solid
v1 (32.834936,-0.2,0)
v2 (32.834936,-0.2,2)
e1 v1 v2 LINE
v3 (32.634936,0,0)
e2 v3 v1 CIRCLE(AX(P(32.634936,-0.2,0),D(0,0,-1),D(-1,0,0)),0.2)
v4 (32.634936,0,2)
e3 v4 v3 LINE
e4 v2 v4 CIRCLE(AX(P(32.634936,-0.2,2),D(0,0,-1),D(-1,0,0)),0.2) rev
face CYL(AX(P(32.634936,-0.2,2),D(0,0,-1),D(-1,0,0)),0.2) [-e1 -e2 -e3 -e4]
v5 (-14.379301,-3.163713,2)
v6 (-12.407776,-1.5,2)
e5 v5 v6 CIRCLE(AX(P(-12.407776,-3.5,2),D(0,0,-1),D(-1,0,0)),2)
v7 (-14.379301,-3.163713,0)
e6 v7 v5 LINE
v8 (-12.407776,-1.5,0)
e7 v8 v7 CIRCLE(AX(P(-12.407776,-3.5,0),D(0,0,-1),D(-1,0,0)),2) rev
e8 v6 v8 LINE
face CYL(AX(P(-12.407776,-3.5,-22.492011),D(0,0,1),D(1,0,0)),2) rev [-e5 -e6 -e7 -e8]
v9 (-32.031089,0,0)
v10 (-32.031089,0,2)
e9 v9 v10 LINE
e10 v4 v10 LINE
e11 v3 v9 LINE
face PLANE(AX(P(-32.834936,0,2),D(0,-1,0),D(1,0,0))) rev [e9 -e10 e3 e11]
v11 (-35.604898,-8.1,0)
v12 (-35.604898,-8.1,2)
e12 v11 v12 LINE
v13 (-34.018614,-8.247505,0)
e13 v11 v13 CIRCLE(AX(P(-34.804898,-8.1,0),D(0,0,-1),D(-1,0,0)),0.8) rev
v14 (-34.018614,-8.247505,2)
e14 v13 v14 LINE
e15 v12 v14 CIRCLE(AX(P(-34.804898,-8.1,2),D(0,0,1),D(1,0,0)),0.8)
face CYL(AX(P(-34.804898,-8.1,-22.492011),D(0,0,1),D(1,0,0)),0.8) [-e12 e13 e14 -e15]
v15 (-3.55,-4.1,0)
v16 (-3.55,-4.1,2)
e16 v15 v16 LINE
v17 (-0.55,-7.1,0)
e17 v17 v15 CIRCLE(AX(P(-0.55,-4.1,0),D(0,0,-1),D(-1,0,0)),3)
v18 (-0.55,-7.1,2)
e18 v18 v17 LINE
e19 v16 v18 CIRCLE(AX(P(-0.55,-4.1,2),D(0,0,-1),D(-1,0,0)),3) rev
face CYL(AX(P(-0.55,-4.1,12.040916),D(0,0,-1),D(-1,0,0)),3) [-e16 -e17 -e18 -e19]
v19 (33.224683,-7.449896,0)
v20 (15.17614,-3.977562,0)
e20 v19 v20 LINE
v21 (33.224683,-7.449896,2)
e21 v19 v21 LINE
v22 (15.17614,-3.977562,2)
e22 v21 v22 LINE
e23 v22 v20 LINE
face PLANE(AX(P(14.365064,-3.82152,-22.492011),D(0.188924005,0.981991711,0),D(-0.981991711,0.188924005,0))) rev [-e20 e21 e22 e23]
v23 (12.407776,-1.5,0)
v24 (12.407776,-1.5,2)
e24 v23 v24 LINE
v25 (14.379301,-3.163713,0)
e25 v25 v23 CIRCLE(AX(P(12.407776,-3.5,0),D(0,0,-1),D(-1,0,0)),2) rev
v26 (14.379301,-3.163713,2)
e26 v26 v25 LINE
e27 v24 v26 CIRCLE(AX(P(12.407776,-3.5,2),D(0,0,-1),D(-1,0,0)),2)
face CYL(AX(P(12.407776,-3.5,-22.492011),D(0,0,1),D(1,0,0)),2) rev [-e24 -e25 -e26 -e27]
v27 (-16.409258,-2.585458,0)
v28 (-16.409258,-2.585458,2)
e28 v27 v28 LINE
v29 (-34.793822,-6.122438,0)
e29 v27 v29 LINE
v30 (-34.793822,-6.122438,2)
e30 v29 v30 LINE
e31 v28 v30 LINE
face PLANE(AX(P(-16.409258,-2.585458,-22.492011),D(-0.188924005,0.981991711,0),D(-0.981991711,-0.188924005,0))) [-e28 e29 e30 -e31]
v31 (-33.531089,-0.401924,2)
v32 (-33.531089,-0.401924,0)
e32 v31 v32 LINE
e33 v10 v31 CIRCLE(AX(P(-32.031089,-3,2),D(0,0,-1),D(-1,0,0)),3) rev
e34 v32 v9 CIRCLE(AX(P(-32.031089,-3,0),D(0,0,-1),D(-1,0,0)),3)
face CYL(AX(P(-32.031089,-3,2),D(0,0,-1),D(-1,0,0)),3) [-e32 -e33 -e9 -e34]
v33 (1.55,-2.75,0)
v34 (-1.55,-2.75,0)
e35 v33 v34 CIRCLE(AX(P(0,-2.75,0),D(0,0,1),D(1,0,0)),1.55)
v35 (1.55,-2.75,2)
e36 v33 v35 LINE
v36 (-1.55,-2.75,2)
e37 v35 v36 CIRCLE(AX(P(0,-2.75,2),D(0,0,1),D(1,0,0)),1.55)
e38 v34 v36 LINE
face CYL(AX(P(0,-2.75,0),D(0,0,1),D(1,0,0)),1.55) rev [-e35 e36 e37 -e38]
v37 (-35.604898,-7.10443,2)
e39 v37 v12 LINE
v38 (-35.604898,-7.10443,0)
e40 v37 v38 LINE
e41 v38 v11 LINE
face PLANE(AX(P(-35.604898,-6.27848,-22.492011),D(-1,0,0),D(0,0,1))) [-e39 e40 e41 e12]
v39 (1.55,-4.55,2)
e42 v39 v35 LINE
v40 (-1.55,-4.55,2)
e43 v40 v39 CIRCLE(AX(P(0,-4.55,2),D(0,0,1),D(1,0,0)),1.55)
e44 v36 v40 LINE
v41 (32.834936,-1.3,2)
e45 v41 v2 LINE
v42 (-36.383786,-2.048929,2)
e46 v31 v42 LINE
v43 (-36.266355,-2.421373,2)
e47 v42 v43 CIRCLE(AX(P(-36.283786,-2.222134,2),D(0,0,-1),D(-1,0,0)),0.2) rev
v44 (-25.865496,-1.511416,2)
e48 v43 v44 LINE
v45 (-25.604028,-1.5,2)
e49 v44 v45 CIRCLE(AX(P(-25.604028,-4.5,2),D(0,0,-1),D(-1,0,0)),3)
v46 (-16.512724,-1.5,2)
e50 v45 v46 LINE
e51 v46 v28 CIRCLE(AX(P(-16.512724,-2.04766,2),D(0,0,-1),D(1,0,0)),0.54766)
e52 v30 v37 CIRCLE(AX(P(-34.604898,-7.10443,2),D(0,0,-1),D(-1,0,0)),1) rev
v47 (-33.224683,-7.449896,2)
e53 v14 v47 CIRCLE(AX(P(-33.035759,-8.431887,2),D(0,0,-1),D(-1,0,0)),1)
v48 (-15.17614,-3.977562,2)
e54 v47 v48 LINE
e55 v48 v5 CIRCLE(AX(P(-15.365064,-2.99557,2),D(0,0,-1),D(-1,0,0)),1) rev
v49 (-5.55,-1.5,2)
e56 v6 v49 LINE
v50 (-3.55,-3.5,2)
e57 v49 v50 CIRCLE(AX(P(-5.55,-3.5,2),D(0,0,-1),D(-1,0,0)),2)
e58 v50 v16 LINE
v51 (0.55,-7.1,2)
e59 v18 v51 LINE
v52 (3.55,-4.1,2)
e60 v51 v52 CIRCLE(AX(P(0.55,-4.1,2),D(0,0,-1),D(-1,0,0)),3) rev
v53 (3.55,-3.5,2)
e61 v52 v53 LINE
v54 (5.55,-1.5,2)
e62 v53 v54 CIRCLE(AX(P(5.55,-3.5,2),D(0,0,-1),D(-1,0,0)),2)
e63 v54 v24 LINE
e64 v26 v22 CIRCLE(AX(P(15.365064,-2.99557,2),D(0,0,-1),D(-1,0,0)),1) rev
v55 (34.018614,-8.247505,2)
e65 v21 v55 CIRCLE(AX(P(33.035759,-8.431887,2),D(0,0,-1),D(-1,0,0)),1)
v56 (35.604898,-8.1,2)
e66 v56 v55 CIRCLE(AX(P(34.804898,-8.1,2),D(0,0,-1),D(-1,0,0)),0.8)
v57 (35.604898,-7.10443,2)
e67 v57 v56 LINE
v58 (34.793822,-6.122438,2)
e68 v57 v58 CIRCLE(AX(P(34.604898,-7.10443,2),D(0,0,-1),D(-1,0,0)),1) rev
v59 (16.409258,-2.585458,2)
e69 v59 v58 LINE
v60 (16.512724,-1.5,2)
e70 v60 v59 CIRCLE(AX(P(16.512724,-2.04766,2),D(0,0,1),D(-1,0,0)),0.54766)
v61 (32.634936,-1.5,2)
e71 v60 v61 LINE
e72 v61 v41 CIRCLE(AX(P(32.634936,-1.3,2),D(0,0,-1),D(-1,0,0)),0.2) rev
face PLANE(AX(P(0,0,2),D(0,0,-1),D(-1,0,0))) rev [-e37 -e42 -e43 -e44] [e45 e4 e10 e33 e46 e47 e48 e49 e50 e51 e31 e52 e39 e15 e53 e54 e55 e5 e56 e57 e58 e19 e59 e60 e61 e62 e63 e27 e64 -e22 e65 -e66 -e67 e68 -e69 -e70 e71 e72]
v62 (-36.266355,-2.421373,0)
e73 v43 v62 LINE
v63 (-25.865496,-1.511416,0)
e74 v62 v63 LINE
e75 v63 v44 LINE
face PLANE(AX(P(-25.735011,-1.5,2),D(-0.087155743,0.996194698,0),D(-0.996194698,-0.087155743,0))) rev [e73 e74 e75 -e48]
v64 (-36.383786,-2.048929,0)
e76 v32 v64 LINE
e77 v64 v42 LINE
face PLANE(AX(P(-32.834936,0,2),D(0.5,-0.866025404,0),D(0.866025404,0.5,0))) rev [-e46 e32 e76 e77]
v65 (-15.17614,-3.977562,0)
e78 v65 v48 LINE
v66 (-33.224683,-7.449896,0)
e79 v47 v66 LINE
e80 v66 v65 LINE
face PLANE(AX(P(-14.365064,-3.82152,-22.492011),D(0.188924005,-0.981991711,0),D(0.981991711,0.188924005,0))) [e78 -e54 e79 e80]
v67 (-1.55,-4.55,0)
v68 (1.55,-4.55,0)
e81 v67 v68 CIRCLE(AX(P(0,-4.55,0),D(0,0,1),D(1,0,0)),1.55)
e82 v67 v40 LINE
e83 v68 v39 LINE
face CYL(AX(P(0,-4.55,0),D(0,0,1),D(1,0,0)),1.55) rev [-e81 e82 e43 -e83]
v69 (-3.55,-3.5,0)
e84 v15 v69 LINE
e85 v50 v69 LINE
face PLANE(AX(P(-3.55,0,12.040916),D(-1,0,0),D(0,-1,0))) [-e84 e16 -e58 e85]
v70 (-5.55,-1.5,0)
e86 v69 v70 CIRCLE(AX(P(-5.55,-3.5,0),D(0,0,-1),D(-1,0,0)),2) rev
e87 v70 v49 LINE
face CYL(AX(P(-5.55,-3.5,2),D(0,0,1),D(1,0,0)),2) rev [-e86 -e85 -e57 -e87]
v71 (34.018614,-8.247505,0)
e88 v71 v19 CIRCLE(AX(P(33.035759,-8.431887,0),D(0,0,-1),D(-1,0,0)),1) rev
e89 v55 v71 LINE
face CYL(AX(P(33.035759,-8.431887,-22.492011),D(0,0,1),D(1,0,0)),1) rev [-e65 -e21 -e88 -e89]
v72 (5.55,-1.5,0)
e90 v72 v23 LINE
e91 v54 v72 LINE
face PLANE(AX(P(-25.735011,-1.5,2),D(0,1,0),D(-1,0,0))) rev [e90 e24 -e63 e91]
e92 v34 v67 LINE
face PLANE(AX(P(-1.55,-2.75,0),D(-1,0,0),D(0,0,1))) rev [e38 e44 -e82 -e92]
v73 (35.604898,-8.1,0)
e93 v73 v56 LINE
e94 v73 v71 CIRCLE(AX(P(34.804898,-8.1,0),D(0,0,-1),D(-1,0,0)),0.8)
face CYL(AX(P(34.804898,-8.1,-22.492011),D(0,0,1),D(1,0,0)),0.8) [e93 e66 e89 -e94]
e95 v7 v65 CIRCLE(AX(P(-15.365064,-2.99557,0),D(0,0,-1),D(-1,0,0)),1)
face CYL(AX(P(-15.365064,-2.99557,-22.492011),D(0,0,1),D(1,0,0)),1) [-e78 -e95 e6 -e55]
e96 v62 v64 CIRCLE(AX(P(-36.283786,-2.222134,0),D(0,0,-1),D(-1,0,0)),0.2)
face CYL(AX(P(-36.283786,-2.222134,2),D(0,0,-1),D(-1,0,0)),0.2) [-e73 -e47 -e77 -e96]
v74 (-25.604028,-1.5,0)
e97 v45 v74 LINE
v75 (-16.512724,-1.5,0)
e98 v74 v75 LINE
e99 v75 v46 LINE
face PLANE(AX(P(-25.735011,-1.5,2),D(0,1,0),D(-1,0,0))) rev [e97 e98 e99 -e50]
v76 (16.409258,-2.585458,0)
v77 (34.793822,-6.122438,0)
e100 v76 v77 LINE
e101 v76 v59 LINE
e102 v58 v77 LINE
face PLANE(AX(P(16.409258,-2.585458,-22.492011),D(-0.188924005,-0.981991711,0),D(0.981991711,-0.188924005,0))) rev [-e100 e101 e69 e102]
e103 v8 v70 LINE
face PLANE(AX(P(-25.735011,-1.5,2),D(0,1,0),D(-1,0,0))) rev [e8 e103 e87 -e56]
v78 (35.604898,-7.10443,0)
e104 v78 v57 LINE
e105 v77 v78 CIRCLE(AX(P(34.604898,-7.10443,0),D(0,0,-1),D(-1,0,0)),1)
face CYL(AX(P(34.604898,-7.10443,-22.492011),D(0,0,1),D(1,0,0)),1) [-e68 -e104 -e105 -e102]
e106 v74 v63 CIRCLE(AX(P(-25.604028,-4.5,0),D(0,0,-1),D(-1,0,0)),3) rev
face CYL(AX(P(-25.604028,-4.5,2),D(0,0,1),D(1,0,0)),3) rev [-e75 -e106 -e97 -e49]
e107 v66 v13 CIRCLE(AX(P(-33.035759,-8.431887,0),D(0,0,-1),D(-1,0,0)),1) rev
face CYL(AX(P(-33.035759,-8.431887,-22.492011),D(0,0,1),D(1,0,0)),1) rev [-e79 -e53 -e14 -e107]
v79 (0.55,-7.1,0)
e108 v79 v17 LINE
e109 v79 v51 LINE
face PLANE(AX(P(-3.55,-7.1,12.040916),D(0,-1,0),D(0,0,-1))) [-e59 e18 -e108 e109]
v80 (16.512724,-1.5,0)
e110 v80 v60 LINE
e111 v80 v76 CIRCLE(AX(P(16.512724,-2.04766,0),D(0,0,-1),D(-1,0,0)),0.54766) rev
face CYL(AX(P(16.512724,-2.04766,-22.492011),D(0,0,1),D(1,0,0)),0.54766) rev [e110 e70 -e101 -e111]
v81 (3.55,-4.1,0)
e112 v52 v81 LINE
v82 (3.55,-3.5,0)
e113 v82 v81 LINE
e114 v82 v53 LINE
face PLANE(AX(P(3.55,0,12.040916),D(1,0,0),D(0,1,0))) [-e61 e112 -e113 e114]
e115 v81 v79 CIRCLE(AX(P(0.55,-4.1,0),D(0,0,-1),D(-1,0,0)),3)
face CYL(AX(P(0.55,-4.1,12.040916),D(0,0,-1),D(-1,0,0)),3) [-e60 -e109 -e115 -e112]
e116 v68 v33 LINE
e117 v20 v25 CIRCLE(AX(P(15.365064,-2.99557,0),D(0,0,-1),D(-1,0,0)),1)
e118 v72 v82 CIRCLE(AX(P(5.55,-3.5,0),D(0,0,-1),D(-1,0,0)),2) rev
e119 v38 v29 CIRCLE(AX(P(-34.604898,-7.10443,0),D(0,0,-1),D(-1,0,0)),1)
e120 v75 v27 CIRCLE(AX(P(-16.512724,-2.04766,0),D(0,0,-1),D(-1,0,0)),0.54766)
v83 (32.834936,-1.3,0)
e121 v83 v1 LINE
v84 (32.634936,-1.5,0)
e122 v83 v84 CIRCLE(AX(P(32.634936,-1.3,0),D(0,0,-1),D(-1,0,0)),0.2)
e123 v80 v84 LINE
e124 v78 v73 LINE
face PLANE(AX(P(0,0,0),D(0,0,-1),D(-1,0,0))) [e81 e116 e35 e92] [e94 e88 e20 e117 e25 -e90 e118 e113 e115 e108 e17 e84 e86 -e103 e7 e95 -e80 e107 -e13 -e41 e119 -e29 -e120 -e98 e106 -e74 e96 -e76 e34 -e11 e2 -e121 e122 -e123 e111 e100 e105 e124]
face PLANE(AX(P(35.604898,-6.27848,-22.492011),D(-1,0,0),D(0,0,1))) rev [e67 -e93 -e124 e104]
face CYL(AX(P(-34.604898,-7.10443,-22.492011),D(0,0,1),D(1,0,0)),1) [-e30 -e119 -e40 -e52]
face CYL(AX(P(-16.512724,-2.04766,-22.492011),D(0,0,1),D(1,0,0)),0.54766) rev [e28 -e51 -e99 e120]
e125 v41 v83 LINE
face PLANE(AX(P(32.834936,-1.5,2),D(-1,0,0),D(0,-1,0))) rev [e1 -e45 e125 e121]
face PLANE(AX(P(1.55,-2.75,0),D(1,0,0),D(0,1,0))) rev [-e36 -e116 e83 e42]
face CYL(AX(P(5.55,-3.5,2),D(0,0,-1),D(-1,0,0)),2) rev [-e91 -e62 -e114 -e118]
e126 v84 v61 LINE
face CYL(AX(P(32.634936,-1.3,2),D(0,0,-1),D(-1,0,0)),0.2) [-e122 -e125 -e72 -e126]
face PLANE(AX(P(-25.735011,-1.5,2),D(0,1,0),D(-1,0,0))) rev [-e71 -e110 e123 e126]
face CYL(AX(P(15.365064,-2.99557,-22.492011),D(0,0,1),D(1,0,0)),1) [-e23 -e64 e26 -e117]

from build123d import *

# Parameters (mm, degrees)
FLAT_DEPTH              = 2
SKETCH3_W               = 7.1
SKETCH3_H               = 7.1
BOSS_EXTRUDE3_DEPTH     = 2
CUT_EXTRUDE1_DEPTH      = 38.889997963
CUT_EXTRUDE1_DEPTH_BACK = 38.889997963
BOSS_EXTRUDE5_DEPTH     = 2
FILLET3_R               = 1
FILLET4_R               = 2
FILLET8_R               = 2
FILLET6_R               = 0.2
FILLET7_R               = 3


with BuildPart() as part:
    # Sketch2 → flat (new body)
    with BuildSketch(Plane.XY):
        Polygon((-32.834936491, 0), (32.834936491, 0), (32.834936491, -1.5), (-25.735011207, -1.5), (-37.165063509, -2.5), align=None)
    extrude(amount=FLAT_DEPTH)

    # Sketch3 → Boss-Extrude3 (add)
    with BuildSketch(Plane(origin=(0, 0, 0), x_dir=(-1, 0, 0), z_dir=(0, 0, -1))):
        with Locations((0, -3.55)):
            Rectangle(SKETCH3_W, SKETCH3_H)
    extrude(amount=-BOSS_EXTRUDE3_DEPTH)

    # Sketch4 → Cut-Extrude1 (cut, two sides: drawn at the far end of the back side and taken through both)
    with BuildSketch(Plane.XY.offset(2).offset(-CUT_EXTRUDE1_DEPTH_BACK)):
        with BuildLine():
            Line((-1.55, -2.75), (-1.55, -4.55))
            ThreePointArc((-1.55, -4.55), (0, -6.1), (1.55, -4.55))
            Line((1.55, -4.55), (1.55, -2.75))
            ThreePointArc((1.55, -2.75), (0, -1.2), (-1.55, -2.75))
        make_face()
    extrude(amount=CUT_EXTRUDE1_DEPTH + CUT_EXTRUDE1_DEPTH_BACK, mode=Mode.SUBTRACT)

    # Sketch6 → Boss-Extrude5 (add)
    with BuildSketch(Plane.XY.offset(2)):
        with BuildLine():
            Line((-16.409257503, -2.585457858), (-35.604897729, -6.278480095))
            Line((-35.604897729, -6.278480095), (-35.604897729, -8.1))
            ThreePointArc((-35.604897729, -8.1), (-34.804897729, -8.9), (-34.004897729, -8.1))
            Line((-34.004897729, -8.1), (-34.004897729, -7.6))
            Line((-34.004897729, -7.6), (-14.365063509, -3.821519905))
            Line((-14.365063509, -3.821519905), (-14.365063509, -1.5))
            Line((-14.365063509, -1.5), (-16.512723649, -1.5))
            ThreePointArc((-16.512723649, -1.5), (-15.96753469, -1.995692576), (-16.409257503, -2.585457858))
        make_face()
    boss_extrude5 = extrude(amount=-BOSS_EXTRUDE5_DEPTH)

    # Mirror4: Boss-Extrude5 across plane
    add(boss_extrude5.mirror(Plane(origin=(0, 0, 0), x_dir=(0, 0, 1), z_dir=(1, 0, 0))))

    # Fillet3
    fillet3_edges = [part.edges().sort_by_distance(p)[0] for p in [
        (-35.604897729, -6.278480095, 1),
        (-34.004897729, -7.6, 1),
        (-14.365063509, -3.821519905, 1),
        (35.604897729, -6.278480095, 1),
        (34.004897729, -7.6, 1),
        (14.365063509, -3.821519905, 1),
    ]]
    fillet(fillet3_edges, radius=FILLET3_R)

    # Fillet4
    fillet4_edges = [part.edges().sort_by_distance(p)[0] for p in [
        (-14.365063509, -1.5, 1),
        (14.365063509, -1.5, 1),
    ]]
    fillet(fillet4_edges, radius=FILLET4_R)

    # Fillet8
    fillet8_edges = [part.edges().sort_by_distance(p)[0] for p in [
        (-3.55, -1.5, 1),
        (3.55, -1.5, 1),
    ]]
    fillet(fillet8_edges, radius=FILLET8_R)

    # Fillet6
    fillet6_edges = [part.edges().sort_by_distance(p)[0] for p in [
        (32.834936491, 0, 1),
        (32.834936491, -1.5, 1),
        (-37.165063509, -2.5, 1),
    ]]
    fillet(fillet6_edges, radius=FILLET6_R)

    # Fillet7
    # the kernel refuses this fillet: 3 mm, written as the material it adds along each edge
    with BuildSketch(Plane(origin=(-25.735011207, -1.5, 0), x_dir=(-0.996194698091746, -0.0871557427476529, 0), z_dir=(0, 0, 1))) as fillet7_piece_1:
        with BuildLine():
            CenterArc((FILLET7_R * 0.0436609429085, FILLET7_R), FILLET7_R, 265, 5)
            Line((-FILLET7_R * 0.0434947998391, FILLET7_R * 0.00380530190825), (0, 0))
            Line((0, 0), (FILLET7_R * 0.0436609429085, 0))
        make_face()
    extrude(amount=2)
    # the kernel refuses this fillet: 3 mm, written as the material it takes off along each edge
    with BuildSketch(Plane(origin=(3.55, -7.1, -7.5), x_dir=(0, 1, 0), z_dir=(0, 0, 1)), Plane(origin=(-3.55, -7.1, -7.5), x_dir=(1, 0, 0), z_dir=(0, 0, 1))) as fillet7_2_piece_1:
        with BuildLine():
            CenterArc((FILLET7_R, FILLET7_R), FILLET7_R, 180, 90)
            Line((0, FILLET7_R), (0, 0))
            Line((0, 0), (FILLET7_R, 0))
        make_face()
    extrude(amount=17, mode=Mode.SUBTRACT)
    with BuildSketch(Plane(origin=(-32.834936491, 0, -2.009618943), x_dir=(1, 0, 0), z_dir=(0, 0, 1))) as fillet7_2_piece_2:
        with BuildLine():
            CenterArc((FILLET7_R * 0.267949192431, -FILLET7_R), FILLET7_R, 90, 30)
            Line((-FILLET7_R * 0.232050807569, -FILLET7_R * 0.133974596216), (0, 0))
            Line((0, 0), (FILLET7_R * 0.267949192431, 0))
        make_face()
    extrude(amount=6.019237886, mode=Mode.SUBTRACT)


solid = part.part
